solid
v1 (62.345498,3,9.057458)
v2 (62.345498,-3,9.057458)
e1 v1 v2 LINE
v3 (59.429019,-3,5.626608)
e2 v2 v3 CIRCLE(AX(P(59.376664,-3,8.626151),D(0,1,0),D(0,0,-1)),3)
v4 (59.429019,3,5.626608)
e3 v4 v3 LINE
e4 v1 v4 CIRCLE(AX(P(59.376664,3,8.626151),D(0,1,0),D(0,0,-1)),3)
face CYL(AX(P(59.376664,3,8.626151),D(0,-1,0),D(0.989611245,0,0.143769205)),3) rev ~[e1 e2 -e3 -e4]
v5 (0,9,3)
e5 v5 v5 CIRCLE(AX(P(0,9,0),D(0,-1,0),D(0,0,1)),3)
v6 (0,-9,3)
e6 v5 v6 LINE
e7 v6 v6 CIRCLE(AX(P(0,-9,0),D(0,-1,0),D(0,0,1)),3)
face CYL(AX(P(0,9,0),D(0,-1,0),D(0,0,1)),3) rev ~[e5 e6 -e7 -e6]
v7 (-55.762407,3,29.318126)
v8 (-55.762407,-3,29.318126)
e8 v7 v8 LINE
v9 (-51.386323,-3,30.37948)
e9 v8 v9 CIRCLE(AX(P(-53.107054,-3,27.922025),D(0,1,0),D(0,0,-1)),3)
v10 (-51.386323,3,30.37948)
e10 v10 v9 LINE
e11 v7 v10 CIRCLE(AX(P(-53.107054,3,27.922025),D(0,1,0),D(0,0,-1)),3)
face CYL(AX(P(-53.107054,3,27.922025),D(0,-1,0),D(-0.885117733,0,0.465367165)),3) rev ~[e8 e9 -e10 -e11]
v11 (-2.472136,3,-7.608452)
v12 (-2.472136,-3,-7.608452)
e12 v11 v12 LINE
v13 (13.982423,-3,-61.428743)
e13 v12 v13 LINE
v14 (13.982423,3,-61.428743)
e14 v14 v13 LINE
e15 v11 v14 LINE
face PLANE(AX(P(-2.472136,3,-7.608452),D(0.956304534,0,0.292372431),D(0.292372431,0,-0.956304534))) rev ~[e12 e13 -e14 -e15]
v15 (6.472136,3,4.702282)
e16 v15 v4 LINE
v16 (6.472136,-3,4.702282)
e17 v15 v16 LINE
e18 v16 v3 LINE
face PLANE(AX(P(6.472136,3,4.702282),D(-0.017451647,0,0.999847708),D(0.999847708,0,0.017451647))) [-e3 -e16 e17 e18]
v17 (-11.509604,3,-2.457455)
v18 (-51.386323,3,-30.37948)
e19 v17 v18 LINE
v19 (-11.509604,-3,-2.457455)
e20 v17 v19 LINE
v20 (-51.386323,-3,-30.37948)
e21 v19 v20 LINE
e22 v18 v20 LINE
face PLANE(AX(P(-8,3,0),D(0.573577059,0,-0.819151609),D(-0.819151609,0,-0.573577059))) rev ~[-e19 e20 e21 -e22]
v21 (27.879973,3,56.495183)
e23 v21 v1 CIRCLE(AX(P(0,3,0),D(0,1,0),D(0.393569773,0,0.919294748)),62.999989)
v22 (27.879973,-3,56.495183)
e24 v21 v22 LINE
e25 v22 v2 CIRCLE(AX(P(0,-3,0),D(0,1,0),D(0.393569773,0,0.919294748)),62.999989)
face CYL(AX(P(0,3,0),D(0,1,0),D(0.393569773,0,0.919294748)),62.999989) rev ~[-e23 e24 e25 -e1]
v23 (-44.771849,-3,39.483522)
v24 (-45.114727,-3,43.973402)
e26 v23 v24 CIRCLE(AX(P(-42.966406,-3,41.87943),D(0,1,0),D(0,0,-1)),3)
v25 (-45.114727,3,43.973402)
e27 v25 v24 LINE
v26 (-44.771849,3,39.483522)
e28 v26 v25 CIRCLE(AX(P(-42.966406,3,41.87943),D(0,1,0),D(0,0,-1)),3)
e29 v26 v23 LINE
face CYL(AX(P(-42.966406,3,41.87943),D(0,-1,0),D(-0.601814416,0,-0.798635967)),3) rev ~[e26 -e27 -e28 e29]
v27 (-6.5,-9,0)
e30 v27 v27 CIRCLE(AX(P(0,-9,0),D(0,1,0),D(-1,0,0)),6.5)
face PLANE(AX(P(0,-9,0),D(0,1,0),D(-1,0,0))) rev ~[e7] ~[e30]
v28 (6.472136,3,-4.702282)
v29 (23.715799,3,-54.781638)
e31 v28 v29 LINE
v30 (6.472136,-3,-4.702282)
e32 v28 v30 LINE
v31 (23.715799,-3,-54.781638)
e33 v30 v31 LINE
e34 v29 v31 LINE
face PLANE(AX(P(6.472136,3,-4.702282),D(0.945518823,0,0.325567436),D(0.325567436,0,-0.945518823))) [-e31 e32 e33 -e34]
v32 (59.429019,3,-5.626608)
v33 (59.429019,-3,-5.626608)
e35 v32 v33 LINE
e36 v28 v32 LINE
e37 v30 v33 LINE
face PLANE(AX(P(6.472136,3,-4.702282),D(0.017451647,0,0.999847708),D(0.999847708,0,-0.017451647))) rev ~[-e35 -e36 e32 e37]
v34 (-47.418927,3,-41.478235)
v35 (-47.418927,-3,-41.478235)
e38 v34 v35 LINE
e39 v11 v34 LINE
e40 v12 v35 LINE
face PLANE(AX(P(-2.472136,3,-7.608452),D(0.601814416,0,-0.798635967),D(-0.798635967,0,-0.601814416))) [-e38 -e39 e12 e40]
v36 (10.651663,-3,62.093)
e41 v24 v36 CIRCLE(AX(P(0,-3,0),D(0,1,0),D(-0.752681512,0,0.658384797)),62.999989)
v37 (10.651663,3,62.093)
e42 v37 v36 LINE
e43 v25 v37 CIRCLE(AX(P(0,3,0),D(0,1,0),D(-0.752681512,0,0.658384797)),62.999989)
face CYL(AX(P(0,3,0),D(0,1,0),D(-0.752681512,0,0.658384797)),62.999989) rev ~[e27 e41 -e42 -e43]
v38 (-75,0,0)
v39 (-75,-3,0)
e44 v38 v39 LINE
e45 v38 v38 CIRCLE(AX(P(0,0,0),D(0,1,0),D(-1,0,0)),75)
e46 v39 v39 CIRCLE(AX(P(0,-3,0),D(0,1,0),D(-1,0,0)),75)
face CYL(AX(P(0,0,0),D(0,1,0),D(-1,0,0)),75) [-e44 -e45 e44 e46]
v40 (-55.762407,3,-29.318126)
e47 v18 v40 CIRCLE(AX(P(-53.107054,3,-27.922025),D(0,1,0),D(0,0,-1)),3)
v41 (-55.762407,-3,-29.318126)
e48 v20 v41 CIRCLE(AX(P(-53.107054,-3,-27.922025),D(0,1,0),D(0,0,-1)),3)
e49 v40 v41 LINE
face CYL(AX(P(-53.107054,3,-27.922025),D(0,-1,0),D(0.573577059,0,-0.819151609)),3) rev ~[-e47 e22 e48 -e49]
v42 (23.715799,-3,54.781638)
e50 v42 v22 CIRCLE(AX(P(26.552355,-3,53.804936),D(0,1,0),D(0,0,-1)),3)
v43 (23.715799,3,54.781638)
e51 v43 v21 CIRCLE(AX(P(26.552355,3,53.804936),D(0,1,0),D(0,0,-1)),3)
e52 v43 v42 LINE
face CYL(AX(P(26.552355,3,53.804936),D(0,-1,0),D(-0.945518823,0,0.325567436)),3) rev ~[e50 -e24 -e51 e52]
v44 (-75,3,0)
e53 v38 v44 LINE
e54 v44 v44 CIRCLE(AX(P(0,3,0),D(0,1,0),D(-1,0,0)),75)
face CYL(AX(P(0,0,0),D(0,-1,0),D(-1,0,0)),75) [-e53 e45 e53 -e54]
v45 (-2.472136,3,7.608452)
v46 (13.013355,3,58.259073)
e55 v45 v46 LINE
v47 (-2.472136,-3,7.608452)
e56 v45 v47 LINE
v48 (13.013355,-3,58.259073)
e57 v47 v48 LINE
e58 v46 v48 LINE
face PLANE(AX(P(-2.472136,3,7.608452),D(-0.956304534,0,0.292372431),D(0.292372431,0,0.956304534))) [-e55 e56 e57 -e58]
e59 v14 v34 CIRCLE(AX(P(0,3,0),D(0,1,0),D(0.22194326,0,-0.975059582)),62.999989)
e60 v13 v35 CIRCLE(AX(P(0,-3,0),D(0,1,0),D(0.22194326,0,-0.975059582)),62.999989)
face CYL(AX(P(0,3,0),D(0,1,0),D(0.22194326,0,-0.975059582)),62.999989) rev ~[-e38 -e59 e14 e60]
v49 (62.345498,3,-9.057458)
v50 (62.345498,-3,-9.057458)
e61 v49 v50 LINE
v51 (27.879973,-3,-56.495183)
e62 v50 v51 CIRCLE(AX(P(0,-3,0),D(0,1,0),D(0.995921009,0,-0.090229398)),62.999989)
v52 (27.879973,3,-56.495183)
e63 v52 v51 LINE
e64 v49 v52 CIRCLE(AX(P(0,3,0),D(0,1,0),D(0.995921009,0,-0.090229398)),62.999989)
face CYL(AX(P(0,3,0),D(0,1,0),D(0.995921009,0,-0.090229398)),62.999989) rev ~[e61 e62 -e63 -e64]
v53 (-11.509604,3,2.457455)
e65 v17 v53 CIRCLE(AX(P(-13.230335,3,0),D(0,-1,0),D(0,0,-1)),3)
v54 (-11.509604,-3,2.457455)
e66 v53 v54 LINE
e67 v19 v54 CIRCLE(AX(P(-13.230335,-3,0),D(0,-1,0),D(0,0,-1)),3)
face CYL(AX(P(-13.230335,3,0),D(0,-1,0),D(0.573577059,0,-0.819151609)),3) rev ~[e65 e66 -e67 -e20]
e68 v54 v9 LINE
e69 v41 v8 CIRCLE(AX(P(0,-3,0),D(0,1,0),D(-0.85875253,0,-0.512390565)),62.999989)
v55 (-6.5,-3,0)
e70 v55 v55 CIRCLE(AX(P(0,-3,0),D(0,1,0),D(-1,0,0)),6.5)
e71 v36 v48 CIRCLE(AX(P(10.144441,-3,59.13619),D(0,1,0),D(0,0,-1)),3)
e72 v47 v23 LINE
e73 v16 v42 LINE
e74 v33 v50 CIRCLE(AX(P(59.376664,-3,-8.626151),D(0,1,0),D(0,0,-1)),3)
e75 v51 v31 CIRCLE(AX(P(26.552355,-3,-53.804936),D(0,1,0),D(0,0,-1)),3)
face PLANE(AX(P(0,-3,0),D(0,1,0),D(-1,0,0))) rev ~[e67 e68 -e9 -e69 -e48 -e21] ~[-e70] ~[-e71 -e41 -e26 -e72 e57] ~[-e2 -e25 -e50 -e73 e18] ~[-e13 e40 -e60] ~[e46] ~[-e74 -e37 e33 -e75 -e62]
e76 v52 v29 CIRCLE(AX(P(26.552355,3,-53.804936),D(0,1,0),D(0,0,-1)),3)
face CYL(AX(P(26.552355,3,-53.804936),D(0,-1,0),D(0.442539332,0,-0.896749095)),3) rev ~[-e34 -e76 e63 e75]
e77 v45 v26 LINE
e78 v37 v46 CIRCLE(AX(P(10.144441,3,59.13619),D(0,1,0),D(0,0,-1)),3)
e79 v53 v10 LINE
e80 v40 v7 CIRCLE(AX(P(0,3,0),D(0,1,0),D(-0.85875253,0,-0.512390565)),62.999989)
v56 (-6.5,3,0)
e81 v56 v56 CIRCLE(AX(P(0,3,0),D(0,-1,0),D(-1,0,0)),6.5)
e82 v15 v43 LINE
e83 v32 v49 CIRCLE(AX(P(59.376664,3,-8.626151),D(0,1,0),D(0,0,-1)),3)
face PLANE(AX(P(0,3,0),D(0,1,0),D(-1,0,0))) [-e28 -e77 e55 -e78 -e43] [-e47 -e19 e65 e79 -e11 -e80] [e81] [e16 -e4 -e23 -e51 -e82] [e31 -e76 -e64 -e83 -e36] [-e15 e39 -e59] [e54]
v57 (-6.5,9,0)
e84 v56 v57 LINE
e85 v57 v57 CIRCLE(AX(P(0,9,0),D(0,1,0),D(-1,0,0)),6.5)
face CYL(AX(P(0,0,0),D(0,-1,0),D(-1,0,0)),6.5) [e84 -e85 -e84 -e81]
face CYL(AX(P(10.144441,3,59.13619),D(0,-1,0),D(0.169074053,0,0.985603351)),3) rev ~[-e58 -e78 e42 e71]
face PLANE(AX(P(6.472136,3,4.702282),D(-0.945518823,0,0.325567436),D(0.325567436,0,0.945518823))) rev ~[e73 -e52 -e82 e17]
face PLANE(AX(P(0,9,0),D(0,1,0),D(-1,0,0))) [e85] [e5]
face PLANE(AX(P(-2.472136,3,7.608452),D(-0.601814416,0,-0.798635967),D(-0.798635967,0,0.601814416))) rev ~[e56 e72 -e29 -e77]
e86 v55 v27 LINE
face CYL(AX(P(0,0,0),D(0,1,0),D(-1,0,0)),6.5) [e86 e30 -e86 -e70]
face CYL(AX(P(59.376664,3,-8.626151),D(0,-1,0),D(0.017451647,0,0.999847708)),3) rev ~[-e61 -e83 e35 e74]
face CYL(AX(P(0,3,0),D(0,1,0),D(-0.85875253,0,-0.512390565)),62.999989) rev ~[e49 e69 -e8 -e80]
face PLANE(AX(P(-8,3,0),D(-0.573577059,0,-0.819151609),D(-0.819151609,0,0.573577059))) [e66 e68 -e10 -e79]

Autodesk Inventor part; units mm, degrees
ref_plane "YZ Plane" through (0, 0, 0) normal (1, 0, 0) x (0, 1, 0)
ref_plane "XY Plane" through (0, 0, 0) normal (0, 0, 1) x (1, 0, 0)
sketch "Skizze1" plane through (0, 0, 0) normal (0, 1, 0) x (-1, 0, 0)
  circle A0 centre (0, 0) radius 75
  dimension "d0" = 150
extrude "Extrusion1" add sketch "Skizze1" along normal mid plane 6
ref_plane "Arbeitsebene1" through (0, 0, 0) normal (0, 1, 0) x (-1, 0, 0)
sketch "Skizze4" plane through (0, 0, 0) normal (0, 1, 0) x (-1, 0, 0)
  circle A0 centre (0, 0) radius 6.5
  dimension "d17" = 13
extrude "Extrusion3" add sketch "Skizze4" along normal mid plane 18
sketch "Skizze5" plane through (0, 9, 0) normal (0, 1, 0) x (1, 0, 0)
  circle A0 centre (0, 0) radius 6.5 projected
hole "Bohrung1" at (0, 9, 0) direction (0, -1, 0) diameter 6 end up to surface
sketch "Skizze2" plane through (0, 3, 0) normal (0, 1, 0) x (1, 0, 0)
  circle A0 centre (0, 0) radius 63 construction
  circle A1 centre (0, 0) radius 75 projected
  line L0 (0, 0) -> (0, -75) construction
  line L1 (0, 0) -> (-75, 0) construction
  circle A2 centre (0, 0) radius 6.5 projected
  line L2 (-8, 0) -> (-54.1014, -32.2806)
  line L3 (-8, 0) -> (-54.1014, 32.2806)
  arc A3 (-54.1014, 32.2806) -> (-54.1014, -32.2806) centre (0, 0) ccw
  dimension "d3" = 126
  dimension "d40" = 8
  dimension "d41" = 35
extrude "Extrusion2" cut sketch "Skizze2" against normal up to surface (6 mm away) contours L2 A3 L3
fillet "Rundung1" radius 3 3 edges at (-8, 0, 0) (-54.1014, 0, 32.2806) (-54.1014, 0, -32.2806)
pattern_circular "Runde Anordnung3" count 5 over 360 about axis through (0, 0, 0) along (0, 1, 0) of "Extrusion2"
fillet "Rundung3" radius 3 6 edges at (24.7949, 0, -57.9156) (62.743, 0, -5.6845) (62.743, 0, 5.6845) (24.7949, 0, 57.9156) (13.9824, 0, 61.4288) (-47.4189, 0, 41.4783)
properties part number "wheel" material "Aluminium 6061"
